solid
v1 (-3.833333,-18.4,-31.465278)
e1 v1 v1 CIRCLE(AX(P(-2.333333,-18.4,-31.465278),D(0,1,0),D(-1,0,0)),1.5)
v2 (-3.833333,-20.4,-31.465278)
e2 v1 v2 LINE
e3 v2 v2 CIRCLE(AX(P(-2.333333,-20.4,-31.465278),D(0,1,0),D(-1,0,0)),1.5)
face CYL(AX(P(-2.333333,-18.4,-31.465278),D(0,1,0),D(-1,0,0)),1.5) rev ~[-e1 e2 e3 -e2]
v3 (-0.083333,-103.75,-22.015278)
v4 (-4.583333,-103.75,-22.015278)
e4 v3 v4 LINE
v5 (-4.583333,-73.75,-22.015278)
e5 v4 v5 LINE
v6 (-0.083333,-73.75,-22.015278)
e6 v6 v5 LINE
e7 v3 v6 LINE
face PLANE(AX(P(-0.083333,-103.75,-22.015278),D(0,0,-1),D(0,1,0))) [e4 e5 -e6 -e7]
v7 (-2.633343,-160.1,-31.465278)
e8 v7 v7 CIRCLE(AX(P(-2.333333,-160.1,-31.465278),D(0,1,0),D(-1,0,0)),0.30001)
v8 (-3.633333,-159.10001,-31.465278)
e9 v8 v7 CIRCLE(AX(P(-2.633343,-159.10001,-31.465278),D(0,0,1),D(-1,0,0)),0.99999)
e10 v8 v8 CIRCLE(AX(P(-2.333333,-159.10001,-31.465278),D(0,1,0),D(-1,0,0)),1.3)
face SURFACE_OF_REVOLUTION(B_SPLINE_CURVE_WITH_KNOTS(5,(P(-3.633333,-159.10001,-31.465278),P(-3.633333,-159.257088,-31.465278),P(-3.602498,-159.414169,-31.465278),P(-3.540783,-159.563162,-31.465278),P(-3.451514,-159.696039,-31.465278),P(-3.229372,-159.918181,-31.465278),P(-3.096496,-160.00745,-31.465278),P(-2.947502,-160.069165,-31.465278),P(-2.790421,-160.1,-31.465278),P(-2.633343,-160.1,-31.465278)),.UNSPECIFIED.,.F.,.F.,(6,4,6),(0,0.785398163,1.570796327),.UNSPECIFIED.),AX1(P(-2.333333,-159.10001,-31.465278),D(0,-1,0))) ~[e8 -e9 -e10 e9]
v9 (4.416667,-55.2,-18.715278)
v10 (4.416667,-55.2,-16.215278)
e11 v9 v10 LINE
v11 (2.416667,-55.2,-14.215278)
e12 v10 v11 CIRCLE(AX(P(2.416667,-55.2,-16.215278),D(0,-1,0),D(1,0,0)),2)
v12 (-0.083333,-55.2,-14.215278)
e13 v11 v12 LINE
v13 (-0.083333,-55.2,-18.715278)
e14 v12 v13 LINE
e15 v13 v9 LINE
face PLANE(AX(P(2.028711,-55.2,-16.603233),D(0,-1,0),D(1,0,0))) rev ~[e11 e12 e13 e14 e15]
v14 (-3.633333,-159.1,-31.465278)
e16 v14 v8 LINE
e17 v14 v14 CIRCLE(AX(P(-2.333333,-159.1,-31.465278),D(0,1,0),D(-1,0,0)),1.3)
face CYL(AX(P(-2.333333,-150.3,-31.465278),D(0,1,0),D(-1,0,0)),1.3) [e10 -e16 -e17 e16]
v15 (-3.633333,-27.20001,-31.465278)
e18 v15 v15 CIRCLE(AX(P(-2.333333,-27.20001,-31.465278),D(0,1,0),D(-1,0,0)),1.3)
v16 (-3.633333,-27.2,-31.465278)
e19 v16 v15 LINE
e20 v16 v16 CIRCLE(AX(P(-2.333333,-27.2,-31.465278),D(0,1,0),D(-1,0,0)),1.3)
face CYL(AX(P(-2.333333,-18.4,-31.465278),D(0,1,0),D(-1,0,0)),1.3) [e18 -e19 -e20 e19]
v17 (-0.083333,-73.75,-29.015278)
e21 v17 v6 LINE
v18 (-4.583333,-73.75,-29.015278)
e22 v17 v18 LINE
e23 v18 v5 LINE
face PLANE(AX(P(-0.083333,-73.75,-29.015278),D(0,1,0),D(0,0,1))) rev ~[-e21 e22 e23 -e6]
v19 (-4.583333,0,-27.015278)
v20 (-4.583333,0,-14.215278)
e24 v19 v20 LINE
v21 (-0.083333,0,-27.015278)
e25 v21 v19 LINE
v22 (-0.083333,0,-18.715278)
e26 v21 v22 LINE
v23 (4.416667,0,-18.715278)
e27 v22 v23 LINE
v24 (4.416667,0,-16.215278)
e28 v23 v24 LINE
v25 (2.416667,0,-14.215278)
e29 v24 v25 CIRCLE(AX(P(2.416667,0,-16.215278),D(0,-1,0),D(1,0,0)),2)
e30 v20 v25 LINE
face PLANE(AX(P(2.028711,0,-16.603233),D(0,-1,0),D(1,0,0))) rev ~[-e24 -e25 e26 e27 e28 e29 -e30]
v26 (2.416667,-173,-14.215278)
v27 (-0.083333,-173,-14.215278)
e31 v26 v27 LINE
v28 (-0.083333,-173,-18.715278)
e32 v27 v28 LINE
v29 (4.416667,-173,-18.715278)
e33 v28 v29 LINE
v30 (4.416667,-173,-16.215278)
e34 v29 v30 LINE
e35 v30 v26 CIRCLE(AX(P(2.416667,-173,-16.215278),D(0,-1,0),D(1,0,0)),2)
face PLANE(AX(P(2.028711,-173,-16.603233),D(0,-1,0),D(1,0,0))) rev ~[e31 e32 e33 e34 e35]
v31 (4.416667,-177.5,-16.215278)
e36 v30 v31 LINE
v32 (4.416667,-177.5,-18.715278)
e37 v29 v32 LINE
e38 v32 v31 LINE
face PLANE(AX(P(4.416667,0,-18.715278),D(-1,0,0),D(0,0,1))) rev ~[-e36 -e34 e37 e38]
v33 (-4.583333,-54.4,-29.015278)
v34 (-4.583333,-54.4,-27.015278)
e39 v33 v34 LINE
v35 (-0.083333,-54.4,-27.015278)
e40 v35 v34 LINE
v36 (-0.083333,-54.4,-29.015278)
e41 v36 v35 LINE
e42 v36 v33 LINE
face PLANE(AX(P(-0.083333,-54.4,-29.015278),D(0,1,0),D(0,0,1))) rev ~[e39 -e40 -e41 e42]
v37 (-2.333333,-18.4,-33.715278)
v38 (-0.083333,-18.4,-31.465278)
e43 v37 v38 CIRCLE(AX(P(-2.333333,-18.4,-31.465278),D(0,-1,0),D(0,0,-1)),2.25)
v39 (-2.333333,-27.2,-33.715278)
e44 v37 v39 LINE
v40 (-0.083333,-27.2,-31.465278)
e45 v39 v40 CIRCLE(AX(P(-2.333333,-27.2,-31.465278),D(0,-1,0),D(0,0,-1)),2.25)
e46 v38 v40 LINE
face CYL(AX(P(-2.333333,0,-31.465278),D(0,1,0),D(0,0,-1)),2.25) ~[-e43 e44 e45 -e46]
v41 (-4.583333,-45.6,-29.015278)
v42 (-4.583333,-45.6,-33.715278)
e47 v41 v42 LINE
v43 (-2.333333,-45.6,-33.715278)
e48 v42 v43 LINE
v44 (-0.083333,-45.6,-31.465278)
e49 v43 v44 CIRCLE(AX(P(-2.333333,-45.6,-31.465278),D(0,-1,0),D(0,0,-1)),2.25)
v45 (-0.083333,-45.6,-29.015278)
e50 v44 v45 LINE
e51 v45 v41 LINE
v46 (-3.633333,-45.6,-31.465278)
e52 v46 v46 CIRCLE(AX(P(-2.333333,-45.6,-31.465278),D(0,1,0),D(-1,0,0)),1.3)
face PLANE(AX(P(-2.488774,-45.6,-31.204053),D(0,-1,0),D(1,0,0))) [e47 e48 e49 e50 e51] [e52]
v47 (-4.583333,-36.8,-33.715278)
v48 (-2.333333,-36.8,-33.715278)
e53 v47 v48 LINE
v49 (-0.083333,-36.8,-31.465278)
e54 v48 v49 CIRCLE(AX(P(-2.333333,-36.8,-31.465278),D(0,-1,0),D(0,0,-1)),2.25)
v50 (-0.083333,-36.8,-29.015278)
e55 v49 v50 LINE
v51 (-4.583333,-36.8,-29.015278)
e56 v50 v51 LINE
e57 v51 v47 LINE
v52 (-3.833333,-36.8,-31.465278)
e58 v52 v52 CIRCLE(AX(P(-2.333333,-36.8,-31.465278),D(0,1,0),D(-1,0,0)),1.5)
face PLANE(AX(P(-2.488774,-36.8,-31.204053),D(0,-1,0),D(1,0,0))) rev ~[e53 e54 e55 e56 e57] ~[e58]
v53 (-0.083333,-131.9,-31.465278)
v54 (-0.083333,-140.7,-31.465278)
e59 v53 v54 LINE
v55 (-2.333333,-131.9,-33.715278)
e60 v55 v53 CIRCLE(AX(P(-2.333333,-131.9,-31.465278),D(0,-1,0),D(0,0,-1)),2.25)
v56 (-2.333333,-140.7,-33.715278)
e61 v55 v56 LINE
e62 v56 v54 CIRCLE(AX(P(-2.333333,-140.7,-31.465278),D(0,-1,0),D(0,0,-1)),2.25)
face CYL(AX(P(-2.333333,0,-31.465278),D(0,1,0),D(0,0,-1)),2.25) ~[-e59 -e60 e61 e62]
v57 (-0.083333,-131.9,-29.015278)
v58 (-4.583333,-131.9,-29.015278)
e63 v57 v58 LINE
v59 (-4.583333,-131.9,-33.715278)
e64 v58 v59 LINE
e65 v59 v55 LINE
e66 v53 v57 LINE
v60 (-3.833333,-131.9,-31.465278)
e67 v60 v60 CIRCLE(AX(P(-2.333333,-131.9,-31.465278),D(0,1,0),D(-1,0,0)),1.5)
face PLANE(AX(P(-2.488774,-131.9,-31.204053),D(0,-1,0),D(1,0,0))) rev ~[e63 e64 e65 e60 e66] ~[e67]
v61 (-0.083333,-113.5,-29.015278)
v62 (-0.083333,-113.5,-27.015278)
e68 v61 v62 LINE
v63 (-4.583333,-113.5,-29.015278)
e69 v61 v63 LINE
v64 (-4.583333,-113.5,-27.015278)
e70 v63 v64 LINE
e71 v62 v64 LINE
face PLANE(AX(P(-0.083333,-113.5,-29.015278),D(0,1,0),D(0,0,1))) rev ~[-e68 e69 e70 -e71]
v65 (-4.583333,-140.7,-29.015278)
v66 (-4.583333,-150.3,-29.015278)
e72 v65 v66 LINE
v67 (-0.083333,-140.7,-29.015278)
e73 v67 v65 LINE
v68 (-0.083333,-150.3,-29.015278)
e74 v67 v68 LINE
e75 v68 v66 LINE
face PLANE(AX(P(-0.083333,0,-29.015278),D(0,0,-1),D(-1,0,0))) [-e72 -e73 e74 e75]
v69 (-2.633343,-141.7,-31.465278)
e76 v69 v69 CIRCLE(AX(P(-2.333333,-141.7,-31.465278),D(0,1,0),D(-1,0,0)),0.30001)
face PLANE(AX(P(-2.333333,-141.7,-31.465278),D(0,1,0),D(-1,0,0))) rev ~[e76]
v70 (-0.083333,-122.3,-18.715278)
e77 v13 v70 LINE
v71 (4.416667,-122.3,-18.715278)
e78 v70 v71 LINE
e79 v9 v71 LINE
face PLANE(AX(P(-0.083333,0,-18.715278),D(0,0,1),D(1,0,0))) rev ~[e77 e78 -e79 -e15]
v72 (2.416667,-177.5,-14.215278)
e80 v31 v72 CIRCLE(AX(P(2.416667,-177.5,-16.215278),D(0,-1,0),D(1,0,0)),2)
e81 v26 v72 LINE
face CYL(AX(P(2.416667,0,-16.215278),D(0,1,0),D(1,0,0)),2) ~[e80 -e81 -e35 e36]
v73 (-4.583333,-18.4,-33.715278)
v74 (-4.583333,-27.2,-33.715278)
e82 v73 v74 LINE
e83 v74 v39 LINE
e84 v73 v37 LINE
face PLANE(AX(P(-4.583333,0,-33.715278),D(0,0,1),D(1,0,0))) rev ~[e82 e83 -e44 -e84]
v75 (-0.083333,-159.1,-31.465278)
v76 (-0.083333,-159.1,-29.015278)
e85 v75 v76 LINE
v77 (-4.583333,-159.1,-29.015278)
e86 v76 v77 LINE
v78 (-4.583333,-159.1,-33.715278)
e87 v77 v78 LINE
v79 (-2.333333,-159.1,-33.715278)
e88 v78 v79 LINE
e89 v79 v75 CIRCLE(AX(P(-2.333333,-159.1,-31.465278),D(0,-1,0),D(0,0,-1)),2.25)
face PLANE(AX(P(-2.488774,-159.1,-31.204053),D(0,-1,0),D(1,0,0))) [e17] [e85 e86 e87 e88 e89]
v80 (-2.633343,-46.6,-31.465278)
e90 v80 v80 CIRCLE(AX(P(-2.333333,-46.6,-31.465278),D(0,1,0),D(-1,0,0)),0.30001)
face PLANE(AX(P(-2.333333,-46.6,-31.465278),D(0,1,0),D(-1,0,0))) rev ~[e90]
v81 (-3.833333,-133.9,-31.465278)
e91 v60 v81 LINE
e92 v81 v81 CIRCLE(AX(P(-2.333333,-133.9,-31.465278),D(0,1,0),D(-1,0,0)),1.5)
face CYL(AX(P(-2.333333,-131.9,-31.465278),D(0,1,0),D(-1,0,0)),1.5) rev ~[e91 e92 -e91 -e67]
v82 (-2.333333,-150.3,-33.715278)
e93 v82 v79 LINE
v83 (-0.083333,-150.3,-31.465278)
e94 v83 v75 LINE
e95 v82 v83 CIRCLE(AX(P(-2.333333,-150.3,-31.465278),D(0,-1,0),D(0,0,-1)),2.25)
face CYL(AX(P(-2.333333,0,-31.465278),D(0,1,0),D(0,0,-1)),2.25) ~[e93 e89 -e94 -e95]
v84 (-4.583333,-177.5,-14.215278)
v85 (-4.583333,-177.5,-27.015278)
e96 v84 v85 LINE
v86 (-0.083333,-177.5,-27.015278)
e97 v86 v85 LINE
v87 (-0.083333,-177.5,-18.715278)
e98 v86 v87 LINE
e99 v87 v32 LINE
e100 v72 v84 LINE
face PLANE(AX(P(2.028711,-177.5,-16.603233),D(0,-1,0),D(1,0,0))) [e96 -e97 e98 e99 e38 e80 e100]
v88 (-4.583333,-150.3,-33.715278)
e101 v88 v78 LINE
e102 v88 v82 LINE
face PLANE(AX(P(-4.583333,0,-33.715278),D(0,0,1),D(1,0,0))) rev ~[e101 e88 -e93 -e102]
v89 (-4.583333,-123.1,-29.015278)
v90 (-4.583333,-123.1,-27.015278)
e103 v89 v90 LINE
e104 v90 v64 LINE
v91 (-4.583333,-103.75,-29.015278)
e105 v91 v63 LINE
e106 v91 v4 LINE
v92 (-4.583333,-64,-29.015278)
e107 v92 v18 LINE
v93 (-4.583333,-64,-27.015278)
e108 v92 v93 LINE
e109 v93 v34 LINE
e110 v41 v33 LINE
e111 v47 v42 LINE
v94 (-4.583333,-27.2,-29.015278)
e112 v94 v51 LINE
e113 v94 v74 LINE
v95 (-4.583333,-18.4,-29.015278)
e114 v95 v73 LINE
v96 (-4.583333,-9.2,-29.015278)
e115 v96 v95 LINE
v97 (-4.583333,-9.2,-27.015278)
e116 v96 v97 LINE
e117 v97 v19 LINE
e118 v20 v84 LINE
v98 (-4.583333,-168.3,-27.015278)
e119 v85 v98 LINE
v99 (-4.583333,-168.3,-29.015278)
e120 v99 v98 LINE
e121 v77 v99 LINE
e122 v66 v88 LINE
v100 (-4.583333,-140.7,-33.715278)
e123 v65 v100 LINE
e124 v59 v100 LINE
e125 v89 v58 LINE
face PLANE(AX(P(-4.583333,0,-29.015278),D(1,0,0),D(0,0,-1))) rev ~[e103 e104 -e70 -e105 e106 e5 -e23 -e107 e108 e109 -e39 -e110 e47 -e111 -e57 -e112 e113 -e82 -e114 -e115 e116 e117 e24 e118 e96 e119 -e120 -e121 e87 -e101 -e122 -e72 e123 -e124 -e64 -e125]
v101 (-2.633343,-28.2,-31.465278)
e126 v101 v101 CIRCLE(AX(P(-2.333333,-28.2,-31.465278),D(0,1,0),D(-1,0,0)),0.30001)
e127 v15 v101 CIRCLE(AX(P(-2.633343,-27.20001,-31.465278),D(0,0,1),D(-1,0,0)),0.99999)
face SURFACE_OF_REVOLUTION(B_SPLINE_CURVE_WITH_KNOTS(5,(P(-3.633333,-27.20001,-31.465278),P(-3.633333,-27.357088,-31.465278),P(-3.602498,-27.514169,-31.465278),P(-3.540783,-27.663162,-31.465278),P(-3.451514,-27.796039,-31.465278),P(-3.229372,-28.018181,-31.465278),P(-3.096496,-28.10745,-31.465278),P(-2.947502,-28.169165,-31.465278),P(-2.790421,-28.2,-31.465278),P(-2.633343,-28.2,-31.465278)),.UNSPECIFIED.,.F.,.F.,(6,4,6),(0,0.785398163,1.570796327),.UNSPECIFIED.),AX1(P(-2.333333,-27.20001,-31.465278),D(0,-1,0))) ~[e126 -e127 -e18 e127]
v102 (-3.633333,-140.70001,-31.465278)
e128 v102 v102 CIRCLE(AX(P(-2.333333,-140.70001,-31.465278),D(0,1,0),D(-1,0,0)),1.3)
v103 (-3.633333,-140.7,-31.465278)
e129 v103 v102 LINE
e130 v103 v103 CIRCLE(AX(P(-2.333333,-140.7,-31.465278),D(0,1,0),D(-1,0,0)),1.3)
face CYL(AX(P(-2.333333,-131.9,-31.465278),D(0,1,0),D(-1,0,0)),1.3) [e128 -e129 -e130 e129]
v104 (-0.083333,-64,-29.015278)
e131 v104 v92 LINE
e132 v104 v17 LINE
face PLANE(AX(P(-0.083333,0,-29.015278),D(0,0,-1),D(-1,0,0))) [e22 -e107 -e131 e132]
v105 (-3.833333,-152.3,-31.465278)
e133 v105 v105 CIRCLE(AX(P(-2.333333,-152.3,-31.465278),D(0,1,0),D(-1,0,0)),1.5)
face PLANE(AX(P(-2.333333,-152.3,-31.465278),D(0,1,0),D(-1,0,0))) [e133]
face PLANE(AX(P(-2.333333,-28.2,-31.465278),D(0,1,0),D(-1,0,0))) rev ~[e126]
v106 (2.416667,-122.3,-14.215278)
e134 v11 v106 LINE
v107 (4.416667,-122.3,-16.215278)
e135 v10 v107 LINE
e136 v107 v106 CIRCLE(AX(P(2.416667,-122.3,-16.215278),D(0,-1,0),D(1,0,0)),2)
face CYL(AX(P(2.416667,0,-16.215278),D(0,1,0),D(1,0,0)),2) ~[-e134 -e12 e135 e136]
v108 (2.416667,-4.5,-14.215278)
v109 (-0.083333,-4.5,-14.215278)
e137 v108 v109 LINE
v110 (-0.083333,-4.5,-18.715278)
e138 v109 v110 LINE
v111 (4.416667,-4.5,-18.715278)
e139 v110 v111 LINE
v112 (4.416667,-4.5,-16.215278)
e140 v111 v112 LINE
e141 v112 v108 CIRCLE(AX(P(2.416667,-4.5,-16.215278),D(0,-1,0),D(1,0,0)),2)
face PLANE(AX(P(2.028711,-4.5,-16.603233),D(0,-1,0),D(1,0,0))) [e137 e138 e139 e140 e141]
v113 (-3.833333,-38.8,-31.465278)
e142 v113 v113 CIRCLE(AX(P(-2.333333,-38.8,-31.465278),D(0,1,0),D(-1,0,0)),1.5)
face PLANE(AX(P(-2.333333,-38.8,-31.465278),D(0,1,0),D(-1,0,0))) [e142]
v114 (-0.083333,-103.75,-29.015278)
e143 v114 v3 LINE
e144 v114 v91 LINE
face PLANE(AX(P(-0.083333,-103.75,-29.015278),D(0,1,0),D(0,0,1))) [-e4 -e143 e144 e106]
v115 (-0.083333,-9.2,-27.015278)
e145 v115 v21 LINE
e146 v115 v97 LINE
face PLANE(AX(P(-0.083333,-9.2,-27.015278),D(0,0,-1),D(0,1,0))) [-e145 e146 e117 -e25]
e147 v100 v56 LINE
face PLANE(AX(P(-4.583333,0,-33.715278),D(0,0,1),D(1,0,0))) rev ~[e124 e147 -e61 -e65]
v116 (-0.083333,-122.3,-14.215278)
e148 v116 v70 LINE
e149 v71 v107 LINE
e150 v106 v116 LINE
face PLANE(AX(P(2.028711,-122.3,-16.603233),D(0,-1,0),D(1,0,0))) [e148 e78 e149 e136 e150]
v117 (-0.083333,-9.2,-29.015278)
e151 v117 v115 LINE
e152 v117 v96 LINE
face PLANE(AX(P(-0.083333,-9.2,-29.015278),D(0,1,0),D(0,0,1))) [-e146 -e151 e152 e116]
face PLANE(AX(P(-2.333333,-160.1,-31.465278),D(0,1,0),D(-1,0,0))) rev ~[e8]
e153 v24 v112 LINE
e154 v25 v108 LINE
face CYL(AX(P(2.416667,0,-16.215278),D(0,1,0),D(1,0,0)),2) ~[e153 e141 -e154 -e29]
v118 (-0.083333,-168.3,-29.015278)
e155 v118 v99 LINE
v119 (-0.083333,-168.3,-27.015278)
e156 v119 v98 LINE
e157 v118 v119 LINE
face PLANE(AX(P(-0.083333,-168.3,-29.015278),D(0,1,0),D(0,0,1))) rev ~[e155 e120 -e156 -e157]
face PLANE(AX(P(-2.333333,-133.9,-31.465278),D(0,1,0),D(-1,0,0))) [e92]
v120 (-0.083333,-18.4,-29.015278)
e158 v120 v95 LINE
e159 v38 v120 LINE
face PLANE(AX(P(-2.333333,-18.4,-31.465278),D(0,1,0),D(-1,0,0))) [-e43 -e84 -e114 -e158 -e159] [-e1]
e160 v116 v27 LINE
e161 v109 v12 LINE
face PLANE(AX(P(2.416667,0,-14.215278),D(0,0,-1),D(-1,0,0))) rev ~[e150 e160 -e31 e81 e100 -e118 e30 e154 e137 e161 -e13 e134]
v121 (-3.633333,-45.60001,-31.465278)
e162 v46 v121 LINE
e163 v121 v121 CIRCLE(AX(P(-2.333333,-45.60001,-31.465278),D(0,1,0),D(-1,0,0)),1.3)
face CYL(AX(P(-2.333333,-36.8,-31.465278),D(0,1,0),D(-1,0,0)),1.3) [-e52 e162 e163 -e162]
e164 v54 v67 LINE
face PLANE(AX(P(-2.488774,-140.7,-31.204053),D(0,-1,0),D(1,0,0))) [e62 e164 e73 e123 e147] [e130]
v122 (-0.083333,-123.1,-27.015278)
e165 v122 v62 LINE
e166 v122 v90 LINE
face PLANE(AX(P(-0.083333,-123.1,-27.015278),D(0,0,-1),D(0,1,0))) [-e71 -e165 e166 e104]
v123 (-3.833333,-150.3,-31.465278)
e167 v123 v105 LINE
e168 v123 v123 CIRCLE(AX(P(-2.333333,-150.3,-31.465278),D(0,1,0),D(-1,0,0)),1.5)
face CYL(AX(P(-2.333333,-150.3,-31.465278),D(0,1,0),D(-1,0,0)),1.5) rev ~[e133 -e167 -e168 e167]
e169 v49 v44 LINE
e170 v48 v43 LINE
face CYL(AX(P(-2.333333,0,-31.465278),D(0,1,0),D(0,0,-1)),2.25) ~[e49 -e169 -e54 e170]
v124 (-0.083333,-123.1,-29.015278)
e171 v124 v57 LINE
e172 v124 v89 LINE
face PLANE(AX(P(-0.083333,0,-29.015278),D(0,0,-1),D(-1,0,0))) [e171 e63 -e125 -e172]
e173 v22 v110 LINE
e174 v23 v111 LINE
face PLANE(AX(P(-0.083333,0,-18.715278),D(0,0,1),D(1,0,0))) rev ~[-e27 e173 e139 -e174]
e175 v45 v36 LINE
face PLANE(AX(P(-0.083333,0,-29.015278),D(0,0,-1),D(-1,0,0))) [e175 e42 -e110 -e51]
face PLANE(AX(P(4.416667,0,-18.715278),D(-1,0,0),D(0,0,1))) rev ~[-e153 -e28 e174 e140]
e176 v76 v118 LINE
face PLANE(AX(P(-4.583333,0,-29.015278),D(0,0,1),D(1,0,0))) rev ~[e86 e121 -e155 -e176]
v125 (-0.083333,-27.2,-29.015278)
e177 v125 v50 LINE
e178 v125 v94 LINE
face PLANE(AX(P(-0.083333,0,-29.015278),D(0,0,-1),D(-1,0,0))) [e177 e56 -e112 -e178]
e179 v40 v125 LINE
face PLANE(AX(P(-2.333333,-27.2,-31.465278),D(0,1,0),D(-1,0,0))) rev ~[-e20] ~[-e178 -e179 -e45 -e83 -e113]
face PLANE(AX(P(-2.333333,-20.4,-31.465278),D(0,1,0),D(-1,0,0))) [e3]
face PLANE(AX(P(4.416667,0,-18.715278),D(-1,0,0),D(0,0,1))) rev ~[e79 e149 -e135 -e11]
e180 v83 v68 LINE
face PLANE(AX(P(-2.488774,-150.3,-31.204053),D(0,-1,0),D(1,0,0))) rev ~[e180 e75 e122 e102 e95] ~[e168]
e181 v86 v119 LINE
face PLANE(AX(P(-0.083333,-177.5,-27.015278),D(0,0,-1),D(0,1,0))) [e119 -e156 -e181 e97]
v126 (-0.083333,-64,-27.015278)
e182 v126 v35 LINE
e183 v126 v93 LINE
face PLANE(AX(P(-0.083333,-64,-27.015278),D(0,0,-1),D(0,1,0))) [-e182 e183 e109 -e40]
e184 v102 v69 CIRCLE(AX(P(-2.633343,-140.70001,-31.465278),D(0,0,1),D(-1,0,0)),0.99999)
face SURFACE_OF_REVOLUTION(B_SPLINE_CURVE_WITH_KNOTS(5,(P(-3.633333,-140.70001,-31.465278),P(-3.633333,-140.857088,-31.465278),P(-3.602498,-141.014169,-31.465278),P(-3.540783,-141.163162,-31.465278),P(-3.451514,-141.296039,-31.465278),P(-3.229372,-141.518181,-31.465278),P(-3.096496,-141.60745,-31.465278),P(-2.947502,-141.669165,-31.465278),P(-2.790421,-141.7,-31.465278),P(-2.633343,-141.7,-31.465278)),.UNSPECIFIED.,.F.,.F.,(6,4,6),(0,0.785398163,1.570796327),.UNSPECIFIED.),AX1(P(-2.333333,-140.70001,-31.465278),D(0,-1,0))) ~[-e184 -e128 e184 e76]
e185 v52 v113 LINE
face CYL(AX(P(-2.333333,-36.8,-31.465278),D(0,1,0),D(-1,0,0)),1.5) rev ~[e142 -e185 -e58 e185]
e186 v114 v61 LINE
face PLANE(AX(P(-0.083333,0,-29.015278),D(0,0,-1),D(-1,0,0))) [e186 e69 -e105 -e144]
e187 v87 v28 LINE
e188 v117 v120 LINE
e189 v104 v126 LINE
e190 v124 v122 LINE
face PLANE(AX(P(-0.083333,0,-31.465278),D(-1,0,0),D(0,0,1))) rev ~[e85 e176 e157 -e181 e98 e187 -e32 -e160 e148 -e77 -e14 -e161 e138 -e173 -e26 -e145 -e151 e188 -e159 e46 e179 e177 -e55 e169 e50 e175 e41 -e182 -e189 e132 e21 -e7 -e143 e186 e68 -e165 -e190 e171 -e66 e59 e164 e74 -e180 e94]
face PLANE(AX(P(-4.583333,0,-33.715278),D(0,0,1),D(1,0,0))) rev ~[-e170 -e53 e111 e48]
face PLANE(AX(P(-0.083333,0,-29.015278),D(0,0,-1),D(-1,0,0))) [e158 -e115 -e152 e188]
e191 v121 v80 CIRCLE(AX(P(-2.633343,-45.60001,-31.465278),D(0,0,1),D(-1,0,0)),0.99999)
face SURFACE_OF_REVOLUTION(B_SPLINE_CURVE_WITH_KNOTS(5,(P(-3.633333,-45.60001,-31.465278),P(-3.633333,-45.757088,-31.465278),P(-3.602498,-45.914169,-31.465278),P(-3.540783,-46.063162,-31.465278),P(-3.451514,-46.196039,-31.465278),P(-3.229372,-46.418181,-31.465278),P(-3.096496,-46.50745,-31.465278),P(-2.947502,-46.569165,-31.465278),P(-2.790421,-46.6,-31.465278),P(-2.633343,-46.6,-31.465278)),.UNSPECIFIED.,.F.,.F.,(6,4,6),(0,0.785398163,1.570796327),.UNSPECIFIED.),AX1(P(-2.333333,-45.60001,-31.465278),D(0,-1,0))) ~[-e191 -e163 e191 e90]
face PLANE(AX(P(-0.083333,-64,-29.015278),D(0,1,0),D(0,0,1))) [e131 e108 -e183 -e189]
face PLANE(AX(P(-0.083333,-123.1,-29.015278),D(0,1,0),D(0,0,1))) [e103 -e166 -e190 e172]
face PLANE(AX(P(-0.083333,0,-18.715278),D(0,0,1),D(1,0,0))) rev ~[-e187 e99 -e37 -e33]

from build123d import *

# Parameters (mm, degrees)
F0_R      = 1.5
F1_DEPTH  = 159.1
F2_DEPTH  = 150.3
F3_DEPTH  = 177.5
F4_DEPTH  = 140.7
F5_DEPTH  = 131.9
F6_DEPTH  = 45.6
F7_DEPTH  = 36.8
F8_DEPTH  = 27.2
F9_DEPTH  = 18.4
F10_DEPTH = 173
F11_DEPTH = 122.3
F12_DEPTH = 55.2
F13_DEPTH = 4.5
F14_W     = 30
F14_H     = 7
F14_W_2   = 9.6
F14_H_2   = 2
F14_W_3   = 9.2
F15_DEPTH = 25
F16_R     = 1.5
F16_R_2   = 1.3
F17_R     = 1.5
F17_R_2   = 1.3
F18_R     = 1.5
F18_R_2   = 1.3
F19_R     = 1.5
F19_R_2   = 1.3
F20_DEPTH = 8.8
F21_DEPTH = 9.8
F22_DEPTH = 2
F23_R     = 0.99999


# Not quite as in the source:
# - a fillet or chamfer is up to 0.001 mm smaller than in the source, because OpenCascade refuses the exact size
# - a feature names something its author has since deleted; it is built from what else it names


with BuildPart() as f1:
    # F0 (on Front) → F1 (new body)
    with BuildSketch(Plane.XZ):
        with BuildLine():
            Line((-0.0833333333, -31.4652777778), (-0.0833333333, -29.0152777778))
            Line((-0.0833333333, -29.0152777778), (-4.5833333333, -29.0152777778))
            Line((-4.5833333333, -29.0152777778), (-4.5833333333, -31.4652777778))
            Line((-4.5833333333, -31.4652777778), (-4.5833333333, -33.7152777778))
            Line((-4.5833333333, -33.7152777778), (-2.3333333333, -33.7152777778))
            ThreePointArc((-2.3333333333, -33.7152777778), (-0.7423430757, -33.0562680354), (-0.0833333333, -31.4652777778))
        make_face()
        with Locations((-2.3333333333, -31.4652777778)):
            Circle(F0_R, mode=Mode.SUBTRACT)
        Polygon((-0.0833333333, -29.0152777778), (-0.0833333333, -18.7152777778), (-0.0833333333, -14.2152777778), (-4.5833333333, -14.2152777778), (-4.5833333333, -29.0152777778), align=None)
    extrude(amount=F1_DEPTH)

    # F0 (on Front) → F2 (cut)
    with BuildSketch(Plane.XZ):
        with BuildLine():
            Line((-0.0833333333, -14.2152777778), (-0.0833333333, -18.7152777778))
            Line((-0.0833333333, -18.7152777778), (4.4166666667, -18.7152777778))
            Line((4.4166666667, -18.7152777778), (4.4166666667, -16.2152777778))
            ThreePointArc((4.4166666667, -16.2152777778), (3.830880229, -14.8010642154), (2.4166666667, -14.2152777778))
            Line((2.4166666667, -14.2152777778), (-0.0833333333, -14.2152777778))
        make_face()
        with BuildLine():
            Line((-0.0833333333, -31.4652777778), (-0.0833333333, -29.0152777778))
            Line((-0.0833333333, -29.0152777778), (-4.5833333333, -29.0152777778))
            Line((-4.5833333333, -29.0152777778), (-4.5833333333, -31.4652777778))
            Line((-4.5833333333, -31.4652777778), (-4.5833333333, -33.7152777778))
            Line((-4.5833333333, -33.7152777778), (-2.3333333333, -33.7152777778))
            ThreePointArc((-2.3333333333, -33.7152777778), (-0.7423430757, -33.0562680354), (-0.0833333333, -31.4652777778))
        make_face()
        with Locations((-2.3333333333, -31.4652777778)):
            Circle(F0_R, mode=Mode.SUBTRACT)
    extrude(amount=F2_DEPTH, mode=Mode.SUBTRACT)

    # F0 (on Front) → F3 (join)
    with BuildSketch(Plane.XZ):
        with BuildLine():
            Line((-0.0833333333, -14.2152777778), (-0.0833333333, -18.7152777778))
            Line((-0.0833333333, -18.7152777778), (4.4166666667, -18.7152777778))
            Line((4.4166666667, -18.7152777778), (4.4166666667, -16.2152777778))
            ThreePointArc((4.4166666667, -16.2152777778), (3.830880229, -14.8010642154), (2.4166666667, -14.2152777778))
            Line((2.4166666667, -14.2152777778), (-0.0833333333, -14.2152777778))
        make_face()
        Polygon((-0.0833333333, -29.0152777778), (-0.0833333333, -18.7152777778), (-0.0833333333, -14.2152777778), (-4.5833333333, -14.2152777778), (-4.5833333333, -29.0152777778), align=None)
    extrude(amount=F3_DEPTH)

    # F0 (on Front) → F4 (join)
    with BuildSketch(Plane.XZ):
        with BuildLine():
            Line((-0.0833333333, -31.4652777778), (-0.0833333333, -29.0152777778))
            Line((-0.0833333333, -29.0152777778), (-4.5833333333, -29.0152777778))
            Line((-4.5833333333, -29.0152777778), (-4.5833333333, -31.4652777778))
            Line((-4.5833333333, -31.4652777778), (-4.5833333333, -33.7152777778))
            Line((-4.5833333333, -33.7152777778), (-2.3333333333, -33.7152777778))
            ThreePointArc((-2.3333333333, -33.7152777778), (-0.7423430757, -33.0562680354), (-0.0833333333, -31.4652777778))
        make_face()
        with Locations((-2.3333333333, -31.4652777778)):
            Circle(F0_R, mode=Mode.SUBTRACT)
    extrude(amount=F4_DEPTH)

    # F0 (on Front) → F5 (cut)
    with BuildSketch(Plane.XZ):
        with BuildLine():
            Line((-0.0833333333, -31.4652777778), (-0.0833333333, -29.0152777778))
            Line((-0.0833333333, -29.0152777778), (-4.5833333333, -29.0152777778))
            Line((-4.5833333333, -29.0152777778), (-4.5833333333, -31.4652777778))
            Line((-4.5833333333, -31.4652777778), (-4.5833333333, -33.7152777778))
            Line((-4.5833333333, -33.7152777778), (-2.3333333333, -33.7152777778))
            ThreePointArc((-2.3333333333, -33.7152777778), (-0.7423430757, -33.0562680354), (-0.0833333333, -31.4652777778))
        make_face()
        with Locations((-2.3333333333, -31.4652777778)):
            Circle(F0_R, mode=Mode.SUBTRACT)
    extrude(amount=F5_DEPTH, mode=Mode.SUBTRACT)

    # F0 (on Front) → F6 (join)
    with BuildSketch(Plane.XZ):
        with BuildLine():
            Line((-0.0833333333, -31.4652777778), (-0.0833333333, -29.0152777778))
            Line((-0.0833333333, -29.0152777778), (-4.5833333333, -29.0152777778))
            Line((-4.5833333333, -29.0152777778), (-4.5833333333, -31.4652777778))
            Line((-4.5833333333, -31.4652777778), (-4.5833333333, -33.7152777778))
            Line((-4.5833333333, -33.7152777778), (-2.3333333333, -33.7152777778))
            ThreePointArc((-2.3333333333, -33.7152777778), (-0.7423430757, -33.0562680354), (-0.0833333333, -31.4652777778))
        make_face()
        with Locations((-2.3333333333, -31.4652777778)):
            Circle(F0_R, mode=Mode.SUBTRACT)
    extrude(amount=F6_DEPTH)

    # F0 (on Front) → F7 (cut)
    with BuildSketch(Plane.XZ):
        with BuildLine():
            Line((-0.0833333333, -31.4652777778), (-0.0833333333, -29.0152777778))
            Line((-0.0833333333, -29.0152777778), (-4.5833333333, -29.0152777778))
            Line((-4.5833333333, -29.0152777778), (-4.5833333333, -31.4652777778))
            Line((-4.5833333333, -31.4652777778), (-4.5833333333, -33.7152777778))
            Line((-4.5833333333, -33.7152777778), (-2.3333333333, -33.7152777778))
            ThreePointArc((-2.3333333333, -33.7152777778), (-0.7423430757, -33.0562680354), (-0.0833333333, -31.4652777778))
        make_face()
        with Locations((-2.3333333333, -31.4652777778)):
            Circle(F0_R, mode=Mode.SUBTRACT)
    extrude(amount=F7_DEPTH, mode=Mode.SUBTRACT)

    # F0 (on Front) → F8 (join)
    with BuildSketch(Plane.XZ):
        with BuildLine():
            Line((-0.0833333333, -31.4652777778), (-0.0833333333, -29.0152777778))
            Line((-0.0833333333, -29.0152777778), (-4.5833333333, -29.0152777778))
            Line((-4.5833333333, -29.0152777778), (-4.5833333333, -31.4652777778))
            Line((-4.5833333333, -31.4652777778), (-4.5833333333, -33.7152777778))
            Line((-4.5833333333, -33.7152777778), (-2.3333333333, -33.7152777778))
            ThreePointArc((-2.3333333333, -33.7152777778), (-0.7423430757, -33.0562680354), (-0.0833333333, -31.4652777778))
        make_face()
        with Locations((-2.3333333333, -31.4652777778)):
            Circle(F0_R, mode=Mode.SUBTRACT)
    extrude(amount=F8_DEPTH)

    # F0 (on Front) → F9 (cut)
    with BuildSketch(Plane.XZ):
        with BuildLine():
            Line((-0.0833333333, -31.4652777778), (-0.0833333333, -29.0152777778))
            Line((-0.0833333333, -29.0152777778), (-4.5833333333, -29.0152777778))
            Line((-4.5833333333, -29.0152777778), (-4.5833333333, -31.4652777778))
            Line((-4.5833333333, -31.4652777778), (-4.5833333333, -33.7152777778))
            Line((-4.5833333333, -33.7152777778), (-2.3333333333, -33.7152777778))
            ThreePointArc((-2.3333333333, -33.7152777778), (-0.7423430757, -33.0562680354), (-0.0833333333, -31.4652777778))
        make_face()
        with Locations((-2.3333333333, -31.4652777778)):
            Circle(F0_R, mode=Mode.SUBTRACT)
    extrude(amount=F9_DEPTH, mode=Mode.SUBTRACT)

    # F0 (on Front) → F10 (cut)
    with BuildSketch(Plane.XZ):
        with BuildLine():
            Line((-0.0833333333, -14.2152777778), (-0.0833333333, -18.7152777778))
            Line((-0.0833333333, -18.7152777778), (4.4166666667, -18.7152777778))
            Line((4.4166666667, -18.7152777778), (4.4166666667, -16.2152777778))
            ThreePointArc((4.4166666667, -16.2152777778), (3.830880229, -14.8010642154), (2.4166666667, -14.2152777778))
            Line((2.4166666667, -14.2152777778), (-0.0833333333, -14.2152777778))
        make_face()
    extrude(amount=F10_DEPTH, mode=Mode.SUBTRACT)

    # F0 (on Front) → F11 (join)
    with BuildSketch(Plane.XZ):
        with BuildLine():
            Line((-0.0833333333, -14.2152777778), (-0.0833333333, -18.7152777778))
            Line((-0.0833333333, -18.7152777778), (4.4166666667, -18.7152777778))
            Line((4.4166666667, -18.7152777778), (4.4166666667, -16.2152777778))
            ThreePointArc((4.4166666667, -16.2152777778), (3.830880229, -14.8010642154), (2.4166666667, -14.2152777778))
            Line((2.4166666667, -14.2152777778), (-0.0833333333, -14.2152777778))
        make_face()
    extrude(amount=F11_DEPTH)

    # F0 (on Front) → F12 (cut)
    with BuildSketch(Plane.XZ):
        with BuildLine():
            Line((-0.0833333333, -14.2152777778), (-0.0833333333, -18.7152777778))
            Line((-0.0833333333, -18.7152777778), (4.4166666667, -18.7152777778))
            Line((4.4166666667, -18.7152777778), (4.4166666667, -16.2152777778))
            ThreePointArc((4.4166666667, -16.2152777778), (3.830880229, -14.8010642154), (2.4166666667, -14.2152777778))
            Line((2.4166666667, -14.2152777778), (-0.0833333333, -14.2152777778))
        make_face()
    extrude(amount=F12_DEPTH, mode=Mode.SUBTRACT)

    # F0 (on Front) → F13 (join)
    with BuildSketch(Plane.XZ):
        with BuildLine():
            Line((-0.0833333333, -14.2152777778), (-0.0833333333, -18.7152777778))
            Line((-0.0833333333, -18.7152777778), (4.4166666667, -18.7152777778))
            Line((4.4166666667, -18.7152777778), (4.4166666667, -16.2152777778))
            ThreePointArc((4.4166666667, -16.2152777778), (3.830880229, -14.8010642154), (2.4166666667, -14.2152777778))
            Line((2.4166666667, -14.2152777778), (-0.0833333333, -14.2152777778))
        make_face()
    extrude(amount=F13_DEPTH)

    # F14 (on face) → F15 (cut)
    with BuildSketch(Plane.YZ.offset(-0.0833333333)):
        with Locations((-88.75, -25.5152777778)):
            Rectangle(F14_W, F14_H)
        with Locations((-59.2, -28.0152777778)):
            Rectangle(F14_W_2, F14_H_2)
        with Locations((-4.6, -28.0152777778)):
            Rectangle(F14_W_3, F14_H_2)
        with Locations((-118.3, -28.0152777778)):
            Rectangle(F14_W_2, F14_H_2)
        with Locations((-172.9, -28.0152777778)):
            Rectangle(F14_W_3, F14_H_2)
    extrude(amount=-F15_DEPTH, mode=Mode.SUBTRACT)

    # F16 (on face) + F17 (on face) + F18 (on face) + F19 (on face) → F20 (join)
    with BuildSketch(Plane(origin=(0, -18.4, 0), x_dir=(-1, 0, 0), z_dir=(0, 1, 0))):
        with Locations((2.3333333333, -31.4652777778)):
            Circle(F16_R)
        with Locations((2.3333333333, -31.4652777778)):
            Circle(F16_R_2, mode=Mode.SUBTRACT)
    with BuildSketch(Plane(origin=(0, -36.8, 0), x_dir=(-1, 0, 0), z_dir=(0, 1, 0))):
        with Locations((2.3333333333, -31.4652777778)):
            Circle(F17_R)
        with Locations((2.3333333333, -31.4652777778)):
            Circle(F17_R_2, mode=Mode.SUBTRACT)
    with BuildSketch(Plane(origin=(0, -131.9, 0), x_dir=(-1, 0, 0), z_dir=(0, 1, 0))):
        with Locations((2.3333333333, -31.4652777778)):
            Circle(F18_R)
        with Locations((2.3333333333, -31.4652777778)):
            Circle(F18_R_2, mode=Mode.SUBTRACT)
    with BuildSketch(Plane(origin=(0, -150.3, 0), x_dir=(-1, 0, 0), z_dir=(0, 1, 0))):
        with Locations((2.3333333333, -31.4652777778)):
            Circle(F19_R)
        with Locations((2.3333333333, -31.4652777778)):
            Circle(F19_R_2, mode=Mode.SUBTRACT)
    extrude(amount=-F20_DEPTH)

    # F16 (on face) + F17 (on face) + F18 (on face) + F19 (on face) → F21 (join)
    with BuildSketch(Plane(origin=(0, -18.4, 0), x_dir=(-1, 0, 0), z_dir=(0, 1, 0))):
        with Locations((2.3333333333, -31.4652777778)):
            Circle(F16_R_2)
    with BuildSketch(Plane(origin=(0, -36.8, 0), x_dir=(-1, 0, 0), z_dir=(0, 1, 0))):
        with Locations((2.3333333333, -31.4652777778)):
            Circle(F17_R_2)
    with BuildSketch(Plane(origin=(0, -131.9, 0), x_dir=(-1, 0, 0), z_dir=(0, 1, 0))):
        with Locations((2.3333333333, -31.4652777778)):
            Circle(F18_R_2)
    with BuildSketch(Plane(origin=(0, -150.3, 0), x_dir=(-1, 0, 0), z_dir=(0, 1, 0))):
        with Locations((2.3333333333, -31.4652777778)):
            Circle(F19_R_2)
    extrude(amount=-F21_DEPTH)

    # F16 (on face) + F17 (on face) + F18 (on face) + F19 (on face) → F22 (cut)
    with BuildSketch(Plane(origin=(0, -18.4, 0), x_dir=(-1, 0, 0), z_dir=(0, 1, 0))):
        with Locations((2.3333333333, -31.4652777778)):
            Circle(F16_R)
        with Locations((2.3333333333, -31.4652777778)):
            Circle(F16_R_2, mode=Mode.SUBTRACT)
        with Locations((2.3333333333, -31.4652777778)):
            Circle(F16_R_2)
    with BuildSketch(Plane(origin=(0, -36.8, 0), x_dir=(-1, 0, 0), z_dir=(0, 1, 0))):
        with Locations((2.3333333333, -31.4652777778)):
            Circle(F17_R)
        with Locations((2.3333333333, -31.4652777778)):
            Circle(F17_R_2, mode=Mode.SUBTRACT)
        with Locations((2.3333333333, -31.4652777778)):
            Circle(F17_R_2)
    with BuildSketch(Plane(origin=(0, -131.9, 0), x_dir=(-1, 0, 0), z_dir=(0, 1, 0))):
        with Locations((2.3333333333, -31.4652777778)):
            Circle(F18_R)
        with Locations((2.3333333333, -31.4652777778)):
            Circle(F18_R_2, mode=Mode.SUBTRACT)
        with Locations((2.3333333333, -31.4652777778)):
            Circle(F18_R_2)
    with BuildSketch(Plane(origin=(0, -150.3, 0), x_dir=(-1, 0, 0), z_dir=(0, 1, 0))):
        with Locations((2.3333333333, -31.4652777778)):
            Circle(F19_R)
        with Locations((2.3333333333, -31.4652777778)):
            Circle(F19_R_2, mode=Mode.SUBTRACT)
        with Locations((2.3333333333, -31.4652777778)):
            Circle(F19_R_2)
    extrude(amount=-F22_DEPTH, mode=Mode.SUBTRACT)

    # F23 (radius 1 in the source; OpenCascade refuses exactly that, so slightly less here)
    f23_edges = [f1.edges().sort_by_distance(p)[0] for p in [
        (-1.033333, -28.2, -31.465278),
        (-1.033333, -46.6, -31.465278),
        (-1.033333, -141.7, -31.465278),
        (-1.033333, -160.1, -31.465278),
    ]]
    fillet(f23_edges, radius=F23_R)


solid = f1.part
